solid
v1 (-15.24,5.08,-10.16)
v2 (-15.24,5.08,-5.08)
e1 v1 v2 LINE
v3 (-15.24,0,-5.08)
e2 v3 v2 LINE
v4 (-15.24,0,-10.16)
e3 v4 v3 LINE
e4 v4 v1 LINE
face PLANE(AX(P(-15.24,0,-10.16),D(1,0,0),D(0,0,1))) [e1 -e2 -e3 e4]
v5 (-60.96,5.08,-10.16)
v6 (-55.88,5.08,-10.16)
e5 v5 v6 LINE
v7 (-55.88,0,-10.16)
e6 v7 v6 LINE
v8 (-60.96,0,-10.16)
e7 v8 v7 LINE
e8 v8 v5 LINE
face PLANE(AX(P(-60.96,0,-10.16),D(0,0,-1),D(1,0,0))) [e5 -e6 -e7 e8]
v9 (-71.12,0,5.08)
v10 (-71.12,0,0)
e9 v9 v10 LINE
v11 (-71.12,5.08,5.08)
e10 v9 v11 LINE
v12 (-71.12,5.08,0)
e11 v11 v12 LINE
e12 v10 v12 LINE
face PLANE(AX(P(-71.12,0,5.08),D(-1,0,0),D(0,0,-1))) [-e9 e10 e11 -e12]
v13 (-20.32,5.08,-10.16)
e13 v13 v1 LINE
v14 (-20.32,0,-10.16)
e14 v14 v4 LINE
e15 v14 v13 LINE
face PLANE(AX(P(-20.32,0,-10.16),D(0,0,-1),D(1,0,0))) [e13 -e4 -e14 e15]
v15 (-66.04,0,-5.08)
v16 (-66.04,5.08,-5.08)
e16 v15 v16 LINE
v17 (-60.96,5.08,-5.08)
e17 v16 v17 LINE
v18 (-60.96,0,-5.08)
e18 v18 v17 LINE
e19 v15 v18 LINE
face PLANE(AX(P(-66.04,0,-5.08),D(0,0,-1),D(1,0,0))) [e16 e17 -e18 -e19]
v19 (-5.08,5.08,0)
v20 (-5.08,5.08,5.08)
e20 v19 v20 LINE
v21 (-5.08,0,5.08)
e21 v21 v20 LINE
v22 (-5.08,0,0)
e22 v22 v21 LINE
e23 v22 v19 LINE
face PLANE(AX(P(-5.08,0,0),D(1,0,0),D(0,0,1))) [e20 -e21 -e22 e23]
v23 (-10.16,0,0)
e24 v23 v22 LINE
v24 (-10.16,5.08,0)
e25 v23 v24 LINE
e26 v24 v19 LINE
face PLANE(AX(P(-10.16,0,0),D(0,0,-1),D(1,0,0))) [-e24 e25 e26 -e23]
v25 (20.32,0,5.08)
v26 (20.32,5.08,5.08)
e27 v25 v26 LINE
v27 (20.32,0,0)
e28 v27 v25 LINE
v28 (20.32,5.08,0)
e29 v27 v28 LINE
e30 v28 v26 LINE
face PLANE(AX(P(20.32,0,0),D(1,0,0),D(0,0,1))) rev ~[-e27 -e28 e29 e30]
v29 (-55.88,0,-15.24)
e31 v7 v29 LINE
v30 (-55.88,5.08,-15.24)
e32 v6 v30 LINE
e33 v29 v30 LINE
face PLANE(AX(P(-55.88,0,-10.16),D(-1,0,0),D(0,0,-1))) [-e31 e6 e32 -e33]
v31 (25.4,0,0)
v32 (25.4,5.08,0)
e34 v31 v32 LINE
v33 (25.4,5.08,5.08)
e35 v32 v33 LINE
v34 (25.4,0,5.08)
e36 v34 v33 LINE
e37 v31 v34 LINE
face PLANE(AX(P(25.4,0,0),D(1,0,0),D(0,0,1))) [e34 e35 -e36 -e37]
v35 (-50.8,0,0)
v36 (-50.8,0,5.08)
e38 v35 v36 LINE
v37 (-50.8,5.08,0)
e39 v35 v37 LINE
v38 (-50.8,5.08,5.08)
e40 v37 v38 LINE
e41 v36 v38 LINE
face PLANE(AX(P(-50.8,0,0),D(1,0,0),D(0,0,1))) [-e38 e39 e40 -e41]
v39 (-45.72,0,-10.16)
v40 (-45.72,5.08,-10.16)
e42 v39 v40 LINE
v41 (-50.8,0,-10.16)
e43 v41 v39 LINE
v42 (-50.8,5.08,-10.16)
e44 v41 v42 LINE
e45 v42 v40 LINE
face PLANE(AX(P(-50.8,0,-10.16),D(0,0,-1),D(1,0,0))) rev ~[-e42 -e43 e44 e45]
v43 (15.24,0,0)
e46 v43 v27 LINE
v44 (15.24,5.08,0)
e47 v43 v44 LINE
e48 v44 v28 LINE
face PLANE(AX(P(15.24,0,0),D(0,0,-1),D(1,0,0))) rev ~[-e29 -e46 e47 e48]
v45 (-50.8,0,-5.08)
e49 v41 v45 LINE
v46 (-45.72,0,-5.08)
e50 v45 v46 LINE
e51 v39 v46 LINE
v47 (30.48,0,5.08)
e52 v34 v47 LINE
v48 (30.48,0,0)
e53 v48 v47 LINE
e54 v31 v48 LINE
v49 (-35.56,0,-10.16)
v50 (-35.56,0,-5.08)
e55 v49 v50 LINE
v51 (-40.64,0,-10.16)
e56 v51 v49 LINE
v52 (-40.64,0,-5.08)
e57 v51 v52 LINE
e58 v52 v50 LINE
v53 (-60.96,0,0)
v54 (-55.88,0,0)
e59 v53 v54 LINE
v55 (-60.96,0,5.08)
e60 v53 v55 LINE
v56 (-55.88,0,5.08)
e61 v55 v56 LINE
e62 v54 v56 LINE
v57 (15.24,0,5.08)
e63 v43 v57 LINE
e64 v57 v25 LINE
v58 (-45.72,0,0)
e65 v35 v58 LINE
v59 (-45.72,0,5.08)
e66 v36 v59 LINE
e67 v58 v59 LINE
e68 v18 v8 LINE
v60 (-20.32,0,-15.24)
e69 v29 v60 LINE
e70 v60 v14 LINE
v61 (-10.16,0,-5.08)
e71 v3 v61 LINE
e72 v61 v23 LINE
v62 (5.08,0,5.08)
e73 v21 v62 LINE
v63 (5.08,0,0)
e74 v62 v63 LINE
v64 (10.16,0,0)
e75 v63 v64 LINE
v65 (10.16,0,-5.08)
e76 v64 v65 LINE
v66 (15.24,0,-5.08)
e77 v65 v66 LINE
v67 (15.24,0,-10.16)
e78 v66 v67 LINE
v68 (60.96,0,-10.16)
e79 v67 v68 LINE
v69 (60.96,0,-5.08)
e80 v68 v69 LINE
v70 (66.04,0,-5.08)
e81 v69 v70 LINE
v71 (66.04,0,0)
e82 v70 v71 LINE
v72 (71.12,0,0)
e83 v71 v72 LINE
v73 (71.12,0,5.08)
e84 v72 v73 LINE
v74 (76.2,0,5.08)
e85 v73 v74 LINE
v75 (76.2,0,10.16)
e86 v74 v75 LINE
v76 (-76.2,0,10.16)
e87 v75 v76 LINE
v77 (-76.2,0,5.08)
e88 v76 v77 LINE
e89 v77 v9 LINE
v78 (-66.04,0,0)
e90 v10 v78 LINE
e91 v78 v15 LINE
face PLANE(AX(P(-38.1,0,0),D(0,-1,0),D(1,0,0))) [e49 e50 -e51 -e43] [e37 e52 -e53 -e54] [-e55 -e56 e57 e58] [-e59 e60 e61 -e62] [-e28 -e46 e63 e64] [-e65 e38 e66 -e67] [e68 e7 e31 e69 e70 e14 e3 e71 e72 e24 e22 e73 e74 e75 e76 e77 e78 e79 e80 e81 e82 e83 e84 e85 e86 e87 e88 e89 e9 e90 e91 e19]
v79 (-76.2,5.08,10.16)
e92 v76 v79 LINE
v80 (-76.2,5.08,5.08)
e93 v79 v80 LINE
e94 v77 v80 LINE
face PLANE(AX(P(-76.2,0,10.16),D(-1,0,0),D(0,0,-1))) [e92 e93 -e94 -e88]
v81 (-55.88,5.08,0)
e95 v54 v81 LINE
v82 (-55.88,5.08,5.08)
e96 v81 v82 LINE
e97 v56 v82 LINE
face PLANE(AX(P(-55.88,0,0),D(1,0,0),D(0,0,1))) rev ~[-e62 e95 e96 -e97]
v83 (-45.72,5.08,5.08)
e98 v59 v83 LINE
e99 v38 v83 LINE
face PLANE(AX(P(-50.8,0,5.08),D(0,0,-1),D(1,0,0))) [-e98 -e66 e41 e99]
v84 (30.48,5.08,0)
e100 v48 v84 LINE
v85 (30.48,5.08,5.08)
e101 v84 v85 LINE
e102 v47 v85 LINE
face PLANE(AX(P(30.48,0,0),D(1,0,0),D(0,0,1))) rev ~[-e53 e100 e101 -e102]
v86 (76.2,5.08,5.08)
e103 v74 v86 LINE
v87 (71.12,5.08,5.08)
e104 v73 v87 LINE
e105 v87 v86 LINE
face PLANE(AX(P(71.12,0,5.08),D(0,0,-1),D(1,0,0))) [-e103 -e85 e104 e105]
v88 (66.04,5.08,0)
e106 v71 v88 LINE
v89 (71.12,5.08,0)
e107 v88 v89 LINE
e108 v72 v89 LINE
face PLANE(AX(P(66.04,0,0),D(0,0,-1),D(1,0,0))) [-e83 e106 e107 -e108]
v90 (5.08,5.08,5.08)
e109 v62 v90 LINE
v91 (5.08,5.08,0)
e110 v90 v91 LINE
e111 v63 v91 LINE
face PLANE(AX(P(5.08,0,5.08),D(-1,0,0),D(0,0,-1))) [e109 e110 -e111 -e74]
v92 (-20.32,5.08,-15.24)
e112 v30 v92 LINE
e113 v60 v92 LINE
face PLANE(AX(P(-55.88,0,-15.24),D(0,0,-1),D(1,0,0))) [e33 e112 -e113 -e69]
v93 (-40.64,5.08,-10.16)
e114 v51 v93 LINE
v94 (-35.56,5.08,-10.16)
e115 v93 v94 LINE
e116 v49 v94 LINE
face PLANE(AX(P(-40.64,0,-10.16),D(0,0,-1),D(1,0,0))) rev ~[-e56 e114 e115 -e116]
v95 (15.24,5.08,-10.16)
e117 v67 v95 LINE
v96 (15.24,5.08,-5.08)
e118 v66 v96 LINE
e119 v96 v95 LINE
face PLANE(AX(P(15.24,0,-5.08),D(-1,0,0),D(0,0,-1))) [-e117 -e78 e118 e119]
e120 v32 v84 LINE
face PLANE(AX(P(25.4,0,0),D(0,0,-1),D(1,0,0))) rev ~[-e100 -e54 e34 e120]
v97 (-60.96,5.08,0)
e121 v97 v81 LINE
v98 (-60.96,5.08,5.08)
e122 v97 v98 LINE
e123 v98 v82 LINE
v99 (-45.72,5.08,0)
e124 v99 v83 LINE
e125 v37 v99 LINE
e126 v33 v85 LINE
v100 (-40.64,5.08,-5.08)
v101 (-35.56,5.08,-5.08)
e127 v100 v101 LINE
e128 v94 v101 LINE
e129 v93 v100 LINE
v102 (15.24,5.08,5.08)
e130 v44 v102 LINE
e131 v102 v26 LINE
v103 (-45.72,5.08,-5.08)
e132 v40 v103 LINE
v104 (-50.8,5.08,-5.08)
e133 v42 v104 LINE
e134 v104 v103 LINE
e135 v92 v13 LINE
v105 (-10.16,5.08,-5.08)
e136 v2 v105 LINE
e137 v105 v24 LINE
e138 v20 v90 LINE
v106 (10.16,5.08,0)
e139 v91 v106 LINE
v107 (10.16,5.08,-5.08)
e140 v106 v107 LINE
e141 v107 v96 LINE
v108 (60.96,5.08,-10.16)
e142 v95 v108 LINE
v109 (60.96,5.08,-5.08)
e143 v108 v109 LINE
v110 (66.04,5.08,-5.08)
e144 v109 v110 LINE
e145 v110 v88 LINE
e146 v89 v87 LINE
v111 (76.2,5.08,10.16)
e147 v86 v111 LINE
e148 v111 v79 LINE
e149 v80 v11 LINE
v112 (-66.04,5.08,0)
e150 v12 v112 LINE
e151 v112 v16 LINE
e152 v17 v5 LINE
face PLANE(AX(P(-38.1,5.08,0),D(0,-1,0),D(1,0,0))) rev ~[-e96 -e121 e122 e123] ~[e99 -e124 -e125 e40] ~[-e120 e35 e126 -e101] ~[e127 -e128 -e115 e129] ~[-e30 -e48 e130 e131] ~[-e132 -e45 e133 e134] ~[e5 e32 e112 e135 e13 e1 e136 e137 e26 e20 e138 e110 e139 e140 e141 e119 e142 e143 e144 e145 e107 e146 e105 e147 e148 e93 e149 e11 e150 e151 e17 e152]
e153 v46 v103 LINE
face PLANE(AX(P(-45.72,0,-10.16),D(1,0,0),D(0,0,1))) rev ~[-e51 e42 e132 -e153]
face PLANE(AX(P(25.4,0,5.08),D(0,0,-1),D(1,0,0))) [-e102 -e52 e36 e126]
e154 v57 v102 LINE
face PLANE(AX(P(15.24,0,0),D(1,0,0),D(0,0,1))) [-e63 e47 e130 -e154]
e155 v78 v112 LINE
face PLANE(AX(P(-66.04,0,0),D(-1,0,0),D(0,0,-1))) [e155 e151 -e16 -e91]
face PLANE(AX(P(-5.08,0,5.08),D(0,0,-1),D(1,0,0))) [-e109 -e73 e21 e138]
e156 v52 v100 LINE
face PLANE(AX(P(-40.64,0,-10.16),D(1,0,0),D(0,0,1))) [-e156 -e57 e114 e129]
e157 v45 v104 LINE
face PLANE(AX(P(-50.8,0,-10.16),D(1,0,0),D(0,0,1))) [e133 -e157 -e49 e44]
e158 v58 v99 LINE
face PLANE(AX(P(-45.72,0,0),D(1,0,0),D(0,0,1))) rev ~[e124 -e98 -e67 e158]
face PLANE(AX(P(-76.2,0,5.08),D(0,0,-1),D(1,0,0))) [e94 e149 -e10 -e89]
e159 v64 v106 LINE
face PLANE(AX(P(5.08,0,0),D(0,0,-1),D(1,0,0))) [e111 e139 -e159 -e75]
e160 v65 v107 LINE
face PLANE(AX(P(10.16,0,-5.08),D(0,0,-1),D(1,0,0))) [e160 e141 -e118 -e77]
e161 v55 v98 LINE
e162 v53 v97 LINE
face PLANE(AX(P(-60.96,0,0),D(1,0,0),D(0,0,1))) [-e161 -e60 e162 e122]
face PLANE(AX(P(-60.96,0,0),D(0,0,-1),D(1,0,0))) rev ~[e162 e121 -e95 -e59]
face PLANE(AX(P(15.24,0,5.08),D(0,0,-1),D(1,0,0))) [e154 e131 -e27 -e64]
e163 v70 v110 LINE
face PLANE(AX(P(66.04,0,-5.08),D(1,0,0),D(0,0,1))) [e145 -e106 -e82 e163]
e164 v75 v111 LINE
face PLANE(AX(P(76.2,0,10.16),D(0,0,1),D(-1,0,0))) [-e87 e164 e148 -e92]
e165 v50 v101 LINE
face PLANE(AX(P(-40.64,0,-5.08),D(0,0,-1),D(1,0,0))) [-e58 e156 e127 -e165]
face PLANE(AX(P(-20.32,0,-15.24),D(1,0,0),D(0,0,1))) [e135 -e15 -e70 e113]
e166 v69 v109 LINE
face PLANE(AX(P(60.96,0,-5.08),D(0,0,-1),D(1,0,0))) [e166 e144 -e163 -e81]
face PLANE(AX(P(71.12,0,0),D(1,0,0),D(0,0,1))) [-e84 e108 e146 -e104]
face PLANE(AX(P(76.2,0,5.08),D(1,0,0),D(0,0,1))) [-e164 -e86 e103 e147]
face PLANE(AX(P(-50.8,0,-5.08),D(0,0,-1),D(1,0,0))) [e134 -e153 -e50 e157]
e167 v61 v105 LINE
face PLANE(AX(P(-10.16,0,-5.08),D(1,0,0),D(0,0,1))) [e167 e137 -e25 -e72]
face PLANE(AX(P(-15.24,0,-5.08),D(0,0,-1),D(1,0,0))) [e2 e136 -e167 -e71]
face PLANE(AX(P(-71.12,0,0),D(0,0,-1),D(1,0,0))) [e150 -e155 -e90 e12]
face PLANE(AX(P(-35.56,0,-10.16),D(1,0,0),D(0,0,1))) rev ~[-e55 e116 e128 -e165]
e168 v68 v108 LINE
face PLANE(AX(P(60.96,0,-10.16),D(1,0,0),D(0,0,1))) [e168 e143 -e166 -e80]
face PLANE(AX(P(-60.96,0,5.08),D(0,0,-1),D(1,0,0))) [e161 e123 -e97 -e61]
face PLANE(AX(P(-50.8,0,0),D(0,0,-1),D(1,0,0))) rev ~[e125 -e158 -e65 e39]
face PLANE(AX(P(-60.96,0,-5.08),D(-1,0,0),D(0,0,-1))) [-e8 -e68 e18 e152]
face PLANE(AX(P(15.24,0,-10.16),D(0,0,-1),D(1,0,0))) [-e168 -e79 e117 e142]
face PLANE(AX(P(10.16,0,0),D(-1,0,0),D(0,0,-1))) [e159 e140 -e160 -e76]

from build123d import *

# Parameters (mm, degrees)
F0_W     = 5.08
F0_H     = 5.08
F1_DEPTH = 5.08


# Not quite as in the source:
# - a feature names something its author has since deleted; it is built from what else it names


with BuildPart() as f1:
    # F0 (on Front) → F1 (new body)
    with BuildSketch(Plane.XZ):
        Polygon((0, 5.08), (0, 10.16), (-76.2, 10.16), (-76.2, 5.08), (-71.12, 5.08), (-71.12, 0), (-66.04, 0), (-66.04, -5.08), (-60.96, -5.08), (-60.96, -10.16), (-55.88, -10.16), (-55.88, -15.24), (-20.32, -15.24), (-20.32, -10.16), (-15.24, -10.16), (-15.24, -5.08), (-10.16, -5.08), (-10.16, 0), (-5.08, 0), (-5.08, 5.08), align=None)
        with Locations((-48.26, -7.62)):
            Rectangle(F0_W, F0_H, mode=Mode.SUBTRACT)
        with Locations((-38.1, -7.62)):
            Rectangle(F0_W, F0_H, mode=Mode.SUBTRACT)
        with Locations((-58.42, 2.54)):
            Rectangle(F0_W, F0_H, mode=Mode.SUBTRACT)
        with Locations((-48.26, 2.54)):
            Rectangle(F0_W, F0_H, mode=Mode.SUBTRACT)
        Polygon((76.2, 10.16), (0, 10.16), (0, 5.08), (5.08, 5.08), (5.08, 0), (10.16, 0), (10.16, -5.08), (15.24, -5.08), (15.24, -10.16), (20.32, -10.16), (55.88, -10.16), (60.96, -10.16), (60.96, -5.08), (66.04, -5.08), (66.04, 0), (71.12, 0), (71.12, 5.08), (76.2, 5.08), align=None)
        with Locations((17.78, 2.54)):
            Rectangle(F0_W, F0_H, mode=Mode.SUBTRACT)
        with Locations((27.94, 2.54)):
            Rectangle(F0_W, F0_H, mode=Mode.SUBTRACT)
    extrude(amount=-F1_DEPTH)


solid = f1.part
